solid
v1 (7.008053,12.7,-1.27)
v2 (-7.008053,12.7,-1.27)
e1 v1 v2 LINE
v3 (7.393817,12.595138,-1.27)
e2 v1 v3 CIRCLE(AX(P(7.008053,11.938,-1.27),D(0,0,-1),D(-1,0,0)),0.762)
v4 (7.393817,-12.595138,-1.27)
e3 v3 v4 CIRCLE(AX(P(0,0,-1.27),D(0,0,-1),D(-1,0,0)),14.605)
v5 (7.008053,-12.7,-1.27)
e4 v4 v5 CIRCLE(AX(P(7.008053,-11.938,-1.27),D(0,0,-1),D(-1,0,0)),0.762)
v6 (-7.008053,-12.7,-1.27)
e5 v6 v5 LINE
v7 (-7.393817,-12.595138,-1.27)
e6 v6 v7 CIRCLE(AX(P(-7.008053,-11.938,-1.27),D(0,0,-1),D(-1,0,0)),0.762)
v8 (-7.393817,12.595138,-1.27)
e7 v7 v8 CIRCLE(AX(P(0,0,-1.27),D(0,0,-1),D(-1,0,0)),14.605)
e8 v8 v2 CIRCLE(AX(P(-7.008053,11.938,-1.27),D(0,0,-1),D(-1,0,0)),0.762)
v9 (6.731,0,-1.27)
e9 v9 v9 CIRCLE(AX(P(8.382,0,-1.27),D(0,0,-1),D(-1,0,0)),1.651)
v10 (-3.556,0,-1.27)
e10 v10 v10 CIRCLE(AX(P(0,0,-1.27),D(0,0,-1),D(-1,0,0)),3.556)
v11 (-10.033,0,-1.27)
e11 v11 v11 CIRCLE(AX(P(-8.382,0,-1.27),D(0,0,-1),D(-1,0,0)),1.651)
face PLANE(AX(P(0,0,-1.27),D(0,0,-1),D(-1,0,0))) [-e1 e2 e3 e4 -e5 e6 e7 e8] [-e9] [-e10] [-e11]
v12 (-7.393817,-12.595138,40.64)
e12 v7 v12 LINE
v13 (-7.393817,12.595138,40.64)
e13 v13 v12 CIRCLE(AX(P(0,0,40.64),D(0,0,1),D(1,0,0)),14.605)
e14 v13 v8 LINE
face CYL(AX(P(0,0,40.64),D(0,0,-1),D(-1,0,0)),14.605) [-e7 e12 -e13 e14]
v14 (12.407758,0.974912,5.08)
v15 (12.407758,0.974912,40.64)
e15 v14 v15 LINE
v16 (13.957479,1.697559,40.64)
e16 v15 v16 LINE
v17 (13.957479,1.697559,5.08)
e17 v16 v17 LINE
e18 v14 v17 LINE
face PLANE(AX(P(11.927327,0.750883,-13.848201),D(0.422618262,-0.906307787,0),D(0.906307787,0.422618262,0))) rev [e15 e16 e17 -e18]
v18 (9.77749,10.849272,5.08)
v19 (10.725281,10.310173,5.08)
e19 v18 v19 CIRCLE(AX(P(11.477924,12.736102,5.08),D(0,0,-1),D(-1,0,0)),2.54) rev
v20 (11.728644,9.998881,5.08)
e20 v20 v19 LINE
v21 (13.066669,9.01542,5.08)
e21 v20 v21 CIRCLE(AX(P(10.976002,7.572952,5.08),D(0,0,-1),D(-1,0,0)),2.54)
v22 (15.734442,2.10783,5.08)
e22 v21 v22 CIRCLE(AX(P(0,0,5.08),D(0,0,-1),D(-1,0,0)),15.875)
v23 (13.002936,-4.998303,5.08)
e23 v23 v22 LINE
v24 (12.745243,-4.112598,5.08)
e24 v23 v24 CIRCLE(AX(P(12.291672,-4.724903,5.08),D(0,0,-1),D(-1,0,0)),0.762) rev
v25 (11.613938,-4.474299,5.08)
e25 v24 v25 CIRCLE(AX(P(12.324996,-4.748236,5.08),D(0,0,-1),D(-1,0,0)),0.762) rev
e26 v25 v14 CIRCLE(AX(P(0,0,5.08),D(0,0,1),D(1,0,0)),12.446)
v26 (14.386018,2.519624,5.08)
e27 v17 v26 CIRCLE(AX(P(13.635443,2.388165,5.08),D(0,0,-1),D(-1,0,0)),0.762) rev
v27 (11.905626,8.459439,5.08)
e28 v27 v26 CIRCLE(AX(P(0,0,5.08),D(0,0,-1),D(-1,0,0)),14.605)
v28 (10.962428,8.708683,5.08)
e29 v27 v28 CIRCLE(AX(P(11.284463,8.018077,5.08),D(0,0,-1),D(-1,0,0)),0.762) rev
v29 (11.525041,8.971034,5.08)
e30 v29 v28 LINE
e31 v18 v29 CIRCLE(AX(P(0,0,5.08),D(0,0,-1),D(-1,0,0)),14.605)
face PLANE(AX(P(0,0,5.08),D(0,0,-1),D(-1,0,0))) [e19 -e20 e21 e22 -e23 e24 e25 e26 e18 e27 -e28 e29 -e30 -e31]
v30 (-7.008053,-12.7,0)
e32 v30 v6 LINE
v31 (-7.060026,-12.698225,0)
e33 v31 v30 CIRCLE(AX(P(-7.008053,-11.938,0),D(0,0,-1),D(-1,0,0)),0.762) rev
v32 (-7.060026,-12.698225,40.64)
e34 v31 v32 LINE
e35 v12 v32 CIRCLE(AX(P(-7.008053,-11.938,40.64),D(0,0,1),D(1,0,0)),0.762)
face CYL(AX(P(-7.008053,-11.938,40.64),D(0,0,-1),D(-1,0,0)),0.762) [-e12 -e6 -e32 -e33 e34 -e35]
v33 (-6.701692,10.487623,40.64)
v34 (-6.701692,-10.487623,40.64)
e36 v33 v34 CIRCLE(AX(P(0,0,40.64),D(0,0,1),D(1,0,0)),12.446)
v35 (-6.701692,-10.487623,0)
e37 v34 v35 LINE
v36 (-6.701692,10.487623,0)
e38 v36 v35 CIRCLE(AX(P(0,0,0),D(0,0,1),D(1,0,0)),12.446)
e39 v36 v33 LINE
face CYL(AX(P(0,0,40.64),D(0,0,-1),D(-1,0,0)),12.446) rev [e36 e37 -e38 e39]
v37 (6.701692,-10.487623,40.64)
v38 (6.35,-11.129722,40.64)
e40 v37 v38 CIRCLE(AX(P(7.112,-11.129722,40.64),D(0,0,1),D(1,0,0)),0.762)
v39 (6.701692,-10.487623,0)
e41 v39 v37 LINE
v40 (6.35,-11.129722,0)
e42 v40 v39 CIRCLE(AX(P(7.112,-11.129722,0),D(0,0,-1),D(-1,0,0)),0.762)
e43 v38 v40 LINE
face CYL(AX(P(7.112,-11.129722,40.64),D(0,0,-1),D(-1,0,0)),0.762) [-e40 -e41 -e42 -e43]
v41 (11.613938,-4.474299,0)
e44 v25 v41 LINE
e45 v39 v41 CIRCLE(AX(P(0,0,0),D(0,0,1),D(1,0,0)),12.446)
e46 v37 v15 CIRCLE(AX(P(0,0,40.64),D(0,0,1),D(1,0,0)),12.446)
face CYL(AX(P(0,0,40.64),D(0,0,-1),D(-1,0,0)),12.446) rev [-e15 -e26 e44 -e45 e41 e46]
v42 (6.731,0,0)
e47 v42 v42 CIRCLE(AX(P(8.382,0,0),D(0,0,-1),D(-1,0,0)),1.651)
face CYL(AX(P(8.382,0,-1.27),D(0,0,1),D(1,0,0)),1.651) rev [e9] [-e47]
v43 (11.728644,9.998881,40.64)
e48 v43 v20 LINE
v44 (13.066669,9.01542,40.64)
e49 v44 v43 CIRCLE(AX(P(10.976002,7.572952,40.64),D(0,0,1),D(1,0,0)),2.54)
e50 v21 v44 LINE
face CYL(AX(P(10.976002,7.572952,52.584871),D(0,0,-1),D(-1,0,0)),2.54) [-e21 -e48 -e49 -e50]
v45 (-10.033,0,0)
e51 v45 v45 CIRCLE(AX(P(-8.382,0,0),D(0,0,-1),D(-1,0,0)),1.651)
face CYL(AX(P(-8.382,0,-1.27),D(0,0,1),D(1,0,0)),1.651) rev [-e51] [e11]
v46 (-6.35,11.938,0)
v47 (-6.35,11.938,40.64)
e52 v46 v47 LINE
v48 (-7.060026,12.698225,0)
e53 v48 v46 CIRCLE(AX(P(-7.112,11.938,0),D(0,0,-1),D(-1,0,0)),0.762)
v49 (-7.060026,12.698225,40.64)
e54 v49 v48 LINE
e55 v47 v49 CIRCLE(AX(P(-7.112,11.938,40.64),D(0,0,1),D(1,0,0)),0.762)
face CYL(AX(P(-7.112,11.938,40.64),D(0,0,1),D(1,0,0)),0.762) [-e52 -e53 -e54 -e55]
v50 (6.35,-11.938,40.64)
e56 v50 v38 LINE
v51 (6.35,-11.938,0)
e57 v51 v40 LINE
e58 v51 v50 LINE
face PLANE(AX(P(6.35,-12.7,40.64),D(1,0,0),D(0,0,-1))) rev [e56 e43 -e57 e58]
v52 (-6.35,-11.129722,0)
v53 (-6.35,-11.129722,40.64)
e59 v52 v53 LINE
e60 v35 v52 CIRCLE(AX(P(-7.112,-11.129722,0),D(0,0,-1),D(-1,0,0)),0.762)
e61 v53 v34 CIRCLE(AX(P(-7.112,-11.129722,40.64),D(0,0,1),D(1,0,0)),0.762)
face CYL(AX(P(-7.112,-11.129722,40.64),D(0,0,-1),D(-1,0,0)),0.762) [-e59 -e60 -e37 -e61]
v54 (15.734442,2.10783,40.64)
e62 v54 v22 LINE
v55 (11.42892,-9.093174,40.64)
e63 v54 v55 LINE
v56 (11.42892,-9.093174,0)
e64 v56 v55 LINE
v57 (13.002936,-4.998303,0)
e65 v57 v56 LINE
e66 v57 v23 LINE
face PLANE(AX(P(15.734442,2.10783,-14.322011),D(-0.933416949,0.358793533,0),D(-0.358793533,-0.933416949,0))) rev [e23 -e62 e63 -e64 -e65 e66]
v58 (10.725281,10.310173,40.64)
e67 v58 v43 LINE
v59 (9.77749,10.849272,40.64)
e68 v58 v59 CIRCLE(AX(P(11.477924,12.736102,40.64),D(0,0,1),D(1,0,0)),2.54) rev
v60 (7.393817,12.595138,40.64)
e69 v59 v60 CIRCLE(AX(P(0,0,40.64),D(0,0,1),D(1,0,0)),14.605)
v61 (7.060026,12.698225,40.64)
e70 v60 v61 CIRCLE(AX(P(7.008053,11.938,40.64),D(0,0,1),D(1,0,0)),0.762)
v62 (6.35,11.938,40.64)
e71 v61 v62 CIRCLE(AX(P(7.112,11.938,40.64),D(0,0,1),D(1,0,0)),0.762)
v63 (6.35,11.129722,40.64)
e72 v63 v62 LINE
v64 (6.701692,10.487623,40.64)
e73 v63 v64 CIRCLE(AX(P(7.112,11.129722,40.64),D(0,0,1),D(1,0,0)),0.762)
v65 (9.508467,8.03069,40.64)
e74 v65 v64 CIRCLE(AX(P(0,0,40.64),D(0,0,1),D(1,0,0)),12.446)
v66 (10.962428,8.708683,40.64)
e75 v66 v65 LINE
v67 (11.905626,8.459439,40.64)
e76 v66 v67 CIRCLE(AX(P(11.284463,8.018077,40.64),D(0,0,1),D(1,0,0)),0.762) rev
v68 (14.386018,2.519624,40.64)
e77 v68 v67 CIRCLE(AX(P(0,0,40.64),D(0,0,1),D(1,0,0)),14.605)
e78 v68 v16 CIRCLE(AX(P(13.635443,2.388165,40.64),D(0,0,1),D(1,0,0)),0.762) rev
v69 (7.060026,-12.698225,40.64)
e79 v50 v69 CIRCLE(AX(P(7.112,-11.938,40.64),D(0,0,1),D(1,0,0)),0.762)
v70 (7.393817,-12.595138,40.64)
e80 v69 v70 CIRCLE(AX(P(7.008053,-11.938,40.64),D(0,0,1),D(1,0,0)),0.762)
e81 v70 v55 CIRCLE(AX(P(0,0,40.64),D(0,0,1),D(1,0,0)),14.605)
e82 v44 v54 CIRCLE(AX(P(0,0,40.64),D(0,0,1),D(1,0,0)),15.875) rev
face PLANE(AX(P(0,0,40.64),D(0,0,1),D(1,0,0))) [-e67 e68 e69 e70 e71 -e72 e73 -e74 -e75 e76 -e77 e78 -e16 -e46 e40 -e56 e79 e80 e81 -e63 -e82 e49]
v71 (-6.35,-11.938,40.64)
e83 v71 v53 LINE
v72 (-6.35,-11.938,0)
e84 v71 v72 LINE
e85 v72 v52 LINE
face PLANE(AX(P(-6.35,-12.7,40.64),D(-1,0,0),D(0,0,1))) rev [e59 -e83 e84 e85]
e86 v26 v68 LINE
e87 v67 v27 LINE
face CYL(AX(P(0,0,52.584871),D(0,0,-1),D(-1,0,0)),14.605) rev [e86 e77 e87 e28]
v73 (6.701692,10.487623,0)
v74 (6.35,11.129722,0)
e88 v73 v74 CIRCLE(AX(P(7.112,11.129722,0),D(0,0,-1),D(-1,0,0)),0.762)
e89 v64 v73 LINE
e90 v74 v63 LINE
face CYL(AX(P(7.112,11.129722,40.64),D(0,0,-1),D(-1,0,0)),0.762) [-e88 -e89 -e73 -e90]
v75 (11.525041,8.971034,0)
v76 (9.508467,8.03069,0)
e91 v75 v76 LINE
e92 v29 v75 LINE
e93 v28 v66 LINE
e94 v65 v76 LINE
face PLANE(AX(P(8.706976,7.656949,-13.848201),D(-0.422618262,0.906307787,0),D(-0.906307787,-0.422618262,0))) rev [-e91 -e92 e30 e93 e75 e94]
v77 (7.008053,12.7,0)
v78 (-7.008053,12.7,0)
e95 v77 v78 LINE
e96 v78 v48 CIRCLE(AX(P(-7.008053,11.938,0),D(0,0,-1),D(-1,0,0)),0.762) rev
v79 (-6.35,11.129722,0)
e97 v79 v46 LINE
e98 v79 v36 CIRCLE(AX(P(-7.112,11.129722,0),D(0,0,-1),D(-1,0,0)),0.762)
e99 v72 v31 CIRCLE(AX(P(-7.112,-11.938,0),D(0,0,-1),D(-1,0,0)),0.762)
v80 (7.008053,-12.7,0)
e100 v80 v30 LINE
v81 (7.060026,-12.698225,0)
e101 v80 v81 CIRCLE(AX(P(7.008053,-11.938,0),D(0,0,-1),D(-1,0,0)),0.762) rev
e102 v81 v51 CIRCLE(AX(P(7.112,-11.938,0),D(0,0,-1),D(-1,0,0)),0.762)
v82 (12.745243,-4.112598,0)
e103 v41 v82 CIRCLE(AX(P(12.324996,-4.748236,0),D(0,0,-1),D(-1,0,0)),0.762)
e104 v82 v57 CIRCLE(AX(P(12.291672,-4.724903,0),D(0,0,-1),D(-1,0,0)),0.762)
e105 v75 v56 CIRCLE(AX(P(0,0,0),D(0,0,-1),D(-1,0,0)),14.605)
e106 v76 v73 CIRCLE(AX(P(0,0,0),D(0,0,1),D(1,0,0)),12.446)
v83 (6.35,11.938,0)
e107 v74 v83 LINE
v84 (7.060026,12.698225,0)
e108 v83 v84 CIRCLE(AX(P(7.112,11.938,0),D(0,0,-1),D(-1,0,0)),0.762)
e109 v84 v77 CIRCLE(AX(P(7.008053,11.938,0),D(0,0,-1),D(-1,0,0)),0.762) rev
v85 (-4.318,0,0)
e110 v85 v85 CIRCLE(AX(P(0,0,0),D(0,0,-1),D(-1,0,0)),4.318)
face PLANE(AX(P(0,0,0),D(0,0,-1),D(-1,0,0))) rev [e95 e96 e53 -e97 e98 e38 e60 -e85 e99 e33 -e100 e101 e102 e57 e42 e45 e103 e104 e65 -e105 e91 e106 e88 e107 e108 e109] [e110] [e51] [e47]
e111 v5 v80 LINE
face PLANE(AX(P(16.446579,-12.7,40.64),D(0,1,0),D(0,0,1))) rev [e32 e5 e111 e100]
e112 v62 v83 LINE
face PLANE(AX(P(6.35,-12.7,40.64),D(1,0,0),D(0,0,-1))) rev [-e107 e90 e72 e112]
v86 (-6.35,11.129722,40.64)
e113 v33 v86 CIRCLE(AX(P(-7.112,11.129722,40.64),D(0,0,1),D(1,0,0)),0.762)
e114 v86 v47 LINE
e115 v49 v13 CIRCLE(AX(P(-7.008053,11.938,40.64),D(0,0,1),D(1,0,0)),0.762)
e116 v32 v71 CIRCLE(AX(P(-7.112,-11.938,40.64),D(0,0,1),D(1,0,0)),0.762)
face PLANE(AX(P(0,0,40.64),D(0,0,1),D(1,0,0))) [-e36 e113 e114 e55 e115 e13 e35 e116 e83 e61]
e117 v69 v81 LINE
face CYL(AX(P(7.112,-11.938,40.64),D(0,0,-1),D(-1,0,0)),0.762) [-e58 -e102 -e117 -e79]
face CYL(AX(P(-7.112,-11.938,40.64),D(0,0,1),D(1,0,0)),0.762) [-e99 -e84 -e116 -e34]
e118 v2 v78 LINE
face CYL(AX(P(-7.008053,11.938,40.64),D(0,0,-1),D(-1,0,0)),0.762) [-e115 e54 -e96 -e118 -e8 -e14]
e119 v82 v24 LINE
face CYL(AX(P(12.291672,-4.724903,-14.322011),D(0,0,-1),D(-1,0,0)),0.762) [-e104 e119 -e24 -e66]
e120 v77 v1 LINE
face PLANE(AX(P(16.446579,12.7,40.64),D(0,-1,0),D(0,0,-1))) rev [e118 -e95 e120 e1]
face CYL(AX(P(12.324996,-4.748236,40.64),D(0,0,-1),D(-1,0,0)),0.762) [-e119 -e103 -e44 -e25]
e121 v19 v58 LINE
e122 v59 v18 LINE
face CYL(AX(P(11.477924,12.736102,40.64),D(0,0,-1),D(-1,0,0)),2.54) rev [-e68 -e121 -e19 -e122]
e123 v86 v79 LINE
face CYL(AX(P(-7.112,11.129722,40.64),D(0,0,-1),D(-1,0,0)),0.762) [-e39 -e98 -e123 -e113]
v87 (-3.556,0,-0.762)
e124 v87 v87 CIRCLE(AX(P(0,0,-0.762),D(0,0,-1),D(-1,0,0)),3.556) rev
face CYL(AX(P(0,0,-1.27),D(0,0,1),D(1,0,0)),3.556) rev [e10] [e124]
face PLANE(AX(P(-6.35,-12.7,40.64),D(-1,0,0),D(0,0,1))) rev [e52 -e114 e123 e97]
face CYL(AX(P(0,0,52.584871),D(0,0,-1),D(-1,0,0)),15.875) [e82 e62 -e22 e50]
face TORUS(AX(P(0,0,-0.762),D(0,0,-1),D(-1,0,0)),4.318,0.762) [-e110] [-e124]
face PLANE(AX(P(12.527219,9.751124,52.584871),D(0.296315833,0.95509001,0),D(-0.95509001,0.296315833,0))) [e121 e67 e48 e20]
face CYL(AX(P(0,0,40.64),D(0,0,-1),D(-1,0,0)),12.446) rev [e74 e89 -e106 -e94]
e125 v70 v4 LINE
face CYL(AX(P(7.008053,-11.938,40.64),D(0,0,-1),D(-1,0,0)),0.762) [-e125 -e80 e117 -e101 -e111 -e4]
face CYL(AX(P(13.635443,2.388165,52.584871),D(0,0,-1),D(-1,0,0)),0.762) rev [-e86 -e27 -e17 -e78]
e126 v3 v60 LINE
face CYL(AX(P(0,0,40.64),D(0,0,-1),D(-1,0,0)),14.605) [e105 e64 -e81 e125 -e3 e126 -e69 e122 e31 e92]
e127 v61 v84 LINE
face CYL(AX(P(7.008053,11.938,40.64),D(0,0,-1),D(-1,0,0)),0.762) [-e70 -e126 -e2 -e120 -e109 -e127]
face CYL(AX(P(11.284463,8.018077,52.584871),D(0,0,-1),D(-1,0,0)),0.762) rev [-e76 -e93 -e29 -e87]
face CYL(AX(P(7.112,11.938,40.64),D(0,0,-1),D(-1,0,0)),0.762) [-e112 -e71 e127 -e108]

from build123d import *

# Parameters (mm, degrees)
SKETCH1_R           = 14.605
SKETCH1_R_2         = 12.446
BOSS_EXTRUDE1_DEPTH = 40.64
BOSS_EXTRUDE2_START = 1.27
SKETCH2_R           = 14.605
SKETCH2_R_2         = 3.556
SKETCH2_R_3         = 1.651
BOSS_EXTRUDE2_DEPTH = 1.27
SKETCH3_W           = 34.056453184
SKETCH3_H           = 6.418177278
SKETCH3_W_2         = 34.979066167
SKETCH3_H_2         = 5.575791511
CUT_EXTRUDE1_DEPTH  = 47.723229233
SKETCH4_W           = 12.7
SKETCH4_H           = 40.64
CUT_EXTRUDE2_DEPTH  = 51.100654936
CUT_EXTRUDE3_DEPTH  = 40.64
BOSS_EXTRUDE3_DEPTH = 41.91
SKETCH7_R           = 15.875
SKETCH7_R_2         = 14.605
CUT_EXTRUDE4_DEPTH  = 6.35
CUT_EXTRUDE5_DEPTH  = 5.08
CUT_EXTRUDE6_REACH  = 48.533
BOSS_EXTRUDE5_DEPTH = 35.56
FILLET1_R           = 0.762
FILLET2_R           = 2.54


with BuildPart() as part:
    # Sketch1 → Boss-Extrude1 (new body)
    with BuildSketch(Plane.XY):
        Circle(SKETCH1_R)
        Circle(SKETCH1_R_2, mode=Mode.SUBTRACT)
    extrude(amount=BOSS_EXTRUDE1_DEPTH)

    # Sketch2 → Boss-Extrude2 (add)
    with BuildSketch(Plane(origin=(0, 0, 0), x_dir=(-1, 0, 0), z_dir=(0, 0, -1)).offset(BOSS_EXTRUDE2_START)):
        Circle(SKETCH2_R)
        Circle(SKETCH2_R_2, mode=Mode.SUBTRACT)
        with Locations((-8.382, 0)):
            Circle(SKETCH2_R_3, mode=Mode.SUBTRACT)
        with Locations((8.382, 0)):
            Circle(SKETCH2_R_3, mode=Mode.SUBTRACT)
    extrude(amount=-BOSS_EXTRUDE2_DEPTH)

    # Sketch3 → Cut-Extrude1 (cut, through all)
    with BuildSketch(Plane(origin=(0, 0, -1.27), x_dir=(-1, 0, 0), z_dir=(0, 0, -1))):
        with Locations((0.581647316, 15.909088639)):
            Rectangle(SKETCH3_W, SKETCH3_H)
        with Locations((1.042953807, -15.487895756)):
            Rectangle(SKETCH3_W_2, SKETCH3_H_2)
    extrude(amount=-CUT_EXTRUDE1_DEPTH, mode=Mode.SUBTRACT)

    # Sketch4 → Cut-Extrude2 (cut, through all)
    with BuildSketch(Plane(origin=(0, 12.7, 0), x_dir=(1, 0, 0), z_dir=(0, 1, 0))):
        with Locations((0, -20.32)):
            Rectangle(SKETCH4_W, SKETCH4_H)
    extrude(amount=-CUT_EXTRUDE2_DEPTH, mode=Mode.SUBTRACT)

    # Sketch5 → Cut-Extrude3 (cut)
    with BuildSketch(Plane.XY.offset(40.64)):
        Polygon((8.706975565, 7.656948551), (15.156085268, 10.664217794), (18.376436422, 3.758152456), (11.927326719, 0.750883214), align=None)
    extrude(amount=-CUT_EXTRUDE3_DEPTH, mode=Mode.SUBTRACT)

    # Sketch6 → Boss-Extrude3 (add)
    with BuildSketch(Plane(origin=(0, 0, -1.27), x_dir=(-1, 0, 0), z_dir=(0, 0, -1))):
        with BuildLine():
            Line((-12.527218586, 9.751124012), (-10.16966665, 10.48255242))
            ThreePointArc((-10.16966665, 10.48255242), (-10.873649709, 9.75037266), (-11.525041099, 8.971034091))
            ThreePointArc((-11.525041099, 8.971034091), (-13.467409843, 5.651096984), (-14.475687068, 1.93920316))
            ThreePointArc((-14.475687068, 1.93920316), (-14.575462242, 0.928399389), (-14.604741501, -0.086894693))
            Line((-14.604741501, -0.086894693), (-15.734442466, 2.107829522))
            ThreePointArc((-15.734442466, 2.107829522), (-14.638488959, 6.142496722), (-12.527218586, 9.751124012))
        make_face()
    extrude(amount=-BOSS_EXTRUDE3_DEPTH)

    # Sketch7 → Cut-Extrude4 (cut)
    with BuildSketch(Plane(origin=(0, 0, -1.27), x_dir=(-1, 0, 0), z_dir=(0, 0, -1))):
        Circle(SKETCH7_R)
        Circle(SKETCH7_R_2, mode=Mode.SUBTRACT)
    extrude(amount=-CUT_EXTRUDE4_DEPTH, mode=Mode.SUBTRACT)

    # Sketch8 → Cut-Extrude5 (cut)
    with BuildSketch(Plane.XY):
        with BuildLine():
            Line((14.475687068, 1.93920316), (12.407758156, 0.974912072))
            ThreePointArc((12.407758156, 0.974912072), (12.445878018, -0.05510311), (12.398639212, -1.084740374))
            Line((12.398639212, -1.084740374), (14.549423566, -1.272909623))
            ThreePointArc((14.549423566, -1.272909623), (14.601153344, 0.335180604), (14.475687068, 1.93920316))
        make_face()
        with BuildLine():
            Line((14.549423566, -1.272909623), (12.398639212, -1.084740374))
            ThreePointArc((12.398639212, -1.084740374), (12.226851946, -2.325297292), (11.931259886, -3.542309069))
            Line((11.931259886, -3.542309069), (13.780666558, -4.837277563))
            ThreePointArc((13.780666558, -4.837277563), (14.276718156, -3.079179062), (14.549423566, -1.272909623))
        make_face()
    extrude(amount=CUT_EXTRUDE5_DEPTH, mode=Mode.SUBTRACT)

    # Cut-Extrude6: up to this face of the body (flat: up to its plane)
    cut_extrude6_end = Plane(part.part.faces().sort_by_distance((9.524357094, -7.422304107, 0))[0])
    # Sketch11 → Cut-Extrude6 (cut, up to the picked face)
    with BuildSketch(Plane.XY.offset(40.64), mode=Mode.PRIVATE) as cut_extrude6_sk1:
        Polygon((15.734442466, 2.107829522), (11.428920073, -9.093173867), (14.392518886, -10.232343334), (18.698041279, 0.968660056), align=None)
    cut_extrude6_tool1 = split(extrude(cut_extrude6_sk1.sketch, amount=-CUT_EXTRUDE6_REACH, mode=Mode.PRIVATE), bisect_by=cut_extrude6_end, keep=Keep.BOTH, mode=Mode.PRIVATE)
    add(cut_extrude6_tool1.solids().sort_by(Axis((15.063481, -4.062257, 40.64), (0, 0, -1)))[0], mode=Mode.SUBTRACT)

    # Sketch12 → Boss-Extrude5 (add)
    with BuildSketch(Plane.XY.offset(40.64)):
        Polygon((14.577046288, -0.903186872), (15.734442466, 2.107829522), (15.155744377, 2.330273663), (13.998348199, -0.680742731), align=None)
    extrude(amount=-BOSS_EXTRUDE5_DEPTH)

    # Fillet1
    # the kernel refuses this fillet: 0.762 mm, written as the material it adds along each edge
    with BuildSketch(Plane(origin=(14.475687068, 1.93920316, 40.64), x_dir=(-0.1526781379658876, 0.9882759666142191, 0), z_dir=(0, 0, -1))) as fillet1_piece_1:
        with BuildLine():
            CenterArc((0.57198511, -0.76184596), FILLET1_R, 88.847914045, 74.934246566)
            Line((-0.159692452, -0.549026914), (0, 0))
            ThreePointArc((0, 0), (0.29365307, 0.002952442), (0.587306139, 0))
        make_face()
    extrude(amount=35.56)
    with BuildSketch(Plane(origin=(11.525041099, 8.971034091, 40.64), x_dir=(0.5968718617370223, -0.8023365756754336, 0), z_dir=(0, 0, -1))) as fillet1_piece_2:
        with BuildLine():
            CenterArc((0.62099819, 0.761818426), FILLET1_R, 191.646188227, 79.60463439)
            Line((-0.12531439, 0.60799537), (0, 0))
            ThreePointArc((0, 0), (0.318816035, -0.00348017), (0.63763207, 0))
        make_face()
    extrude(amount=35.56)
    # the kernel refuses this fillet: 0.762 mm, written as the material it takes off along each edge
    with BuildSketch(Plane(origin=(0, 0, 0), x_dir=(-1, 0, 0), z_dir=(0, -1, 0))) as fillet1_2_piece_1:
        with BuildLine():
            CenterArc((3.556 + FILLET1_R, FILLET1_R), FILLET1_R, 180, 90)
            Line((3.556, FILLET1_R), (3.556, 0))
            Line((3.556, 0), (3.556 + FILLET1_R, 0))
        make_face()
    revolve(axis=Axis((0, 0, 0), (0, 0, -1)), mode=Mode.SUBTRACT)
    with BuildSketch(Plane(origin=(11.931259886, -3.542309069, 0), x_dir=(-0.32230782021248533, -0.9466349185561855, 0), z_dir=(0, 0, 1))) as fillet1_2_piece_2:
        with BuildLine():
            CenterArc((1.014668485, 0.761403744), FILLET1_R, 163.802549626, 103.930693134)
            Line((0.282915237, 0.973962404), (0, 0))
            ThreePointArc((0, 0), (0.492264909, 0.009738855), (0.984529818, 0))
        make_face()
    extrude(amount=5.08, mode=Mode.SUBTRACT)
    with BuildSketch(Plane(origin=(13.216640292, -4.442342119, 0), x_dir=(-0.35879353276176223, -0.9334169490899199, 0), z_dir=(0, 0, 1))) as fillet1_2_piece_3:
        with BuildLine():
            CenterArc((FILLET1_R * 0.781652785228, -FILLET1_R), FILLET1_R, 90, 76.026121217)
            Line((-FILLET1_R * 0.1887531327, -FILLET1_R * 0.758520488551), (0, 0))
            Line((0, 0), (FILLET1_R * 0.781652785228, 0))
        make_face()
    extrude(amount=5.08, mode=Mode.SUBTRACT)
    with BuildSketch(Plane(origin=(-7.212213599, 12.7, -1.794261411), x_dir=(1, 0, 0), z_dir=(0, 0, 1)), Plane(origin=(-7.212213599, -12.7, 41.164261411), x_dir=(1, 0, 0), z_dir=(0, 0, -1))) as fillet1_2_piece_4:
        with BuildLine():
            CenterArc((0.204160731, -0.762), FILLET1_R, 90, 30.414529102)
            ThreePointArc((-0.181603647, -0.104862385), (-0.090990033, -0.052105246), (0, 0))
            Line((0, 0), (0.204160731, 0))
        make_face()
    extrude(amount=42.958522823, mode=Mode.SUBTRACT)
    with BuildSketch(Plane(origin=(7.212213599, 12.7, -1.794261411), x_dir=(0.8659975867148599, -0.500048177482969, -1.8558242316030044e-14), z_dir=(0, 0, 1)), Plane(origin=(7.212213599, -12.7, 41.164261411), x_dir=(0.8659975867148587, 0.5000481774829708, -1.8313973834794986e-14), z_dir=(0, 0, -1))) as fillet1_2_piece_5:
        with BuildLine():
            CenterArc((0.204234011, -0.761980363), FILLET1_R, 89.588658346, 30.414529102)
            Line((-0.176802701, -0.102090202), (0, 0))
            ThreePointArc((0, 0), (0.104852282, 0.000376383), (0.209704565, 0))
        make_face()
    extrude(amount=42.958522823, mode=Mode.SUBTRACT)
    with BuildSketch(Plane(origin=(-6.35, 10.704224213, 41.703745389), x_dir=(0, 1, 0), z_dir=(0, 0, -1))) as fillet1_2_piece_6:
        with BuildLine():
            CenterArc((0.425498156, -0.762), FILLET1_R, 90, 57.421029607)
            ThreePointArc((-0.216601212, -0.351692308), (-0.106841566, -0.176744751), (0, 0))
            Line((0, 0), (0.425498156, 0))
        make_face()
    extrude(amount=41.703745389, mode=Mode.SUBTRACT)
    with BuildSketch(Plane(origin=(-6.35, -10.704224213, 41.703745389), x_dir=(0, -1, 0), z_dir=(0, 0, -1)), Plane(origin=(6.35, 10.704224213, 41.703745389), x_dir=(0, 1, 0), z_dir=(0, 0, -1))) as fillet1_2_piece_7:
        with BuildLine():
            CenterArc((0.425498156, 0.762), FILLET1_R, 212.578970393, 57.421029607)
            ThreePointArc((-0.216601212, 0.351692308), (-0.106841566, 0.176744751), (0, 0))
            Line((0, 0), (0.425498156, 0))
        make_face()
    extrude(amount=41.703745389, mode=Mode.SUBTRACT)
    with BuildSketch(Plane(origin=(6.35, -10.704224213, 41.703745389), x_dir=(0.8514689576122441, 0.5244050097231324, 0), z_dir=(0, 0, -1))) as fillet1_2_piece_8:
        with BuildLine():
            CenterArc((0.425685981, 0.761895088), FILLET1_R, 211.628197432, 57.421029608)
            Line((-0.223133364, 0.362298471), (0, 0))
            ThreePointArc((0, 0), (0.206520922, 0.001713556), (0.413041843, 0))
        make_face()
    extrude(amount=41.703745389, mode=Mode.SUBTRACT)
    with BuildSketch(Plane(origin=(6.35, -12.7, 42.545), x_dir=(1, 0, 0), z_dir=(0, 0, -1)), Plane(origin=(-6.35, -12.7, 0), x_dir=(-1, 0, 0), z_dir=(0, 0, 1))) as fillet1_2_piece_9:
        with BuildLine():
            CenterArc((FILLET1_R, -FILLET1_R), FILLET1_R, 90, 90)
            Line((0, -FILLET1_R), (0, 0))
            Line((0, 0), (FILLET1_R, 0))
        make_face()
    extrude(amount=42.545, mode=Mode.SUBTRACT)
    with BuildSketch(Plane(origin=(-6.35, 12.7, 0), x_dir=(-1, 0, 0), z_dir=(0, 0, 1)), Plane(origin=(6.35, 12.7, 42.545), x_dir=(1, 0, 0), z_dir=(0, 0, -1))) as fillet1_2_piece_10:
        with BuildLine():
            CenterArc((FILLET1_R, FILLET1_R), FILLET1_R, 180, 90)
            Line((0, FILLET1_R), (0, 0))
            Line((0, 0), (FILLET1_R, 0))
        make_face()
    extrude(amount=42.545, mode=Mode.SUBTRACT)

    # Fillet2
    fillet2_edges = [part.edges().sort_by_distance(p)[0] for p in [
        (12.527218586, 9.751124012, 22.86),
        (10.16966665, 10.48255242, 22.86),
    ]]
    fillet(fillet2_edges, radius=FILLET2_R)


solid = part.part
